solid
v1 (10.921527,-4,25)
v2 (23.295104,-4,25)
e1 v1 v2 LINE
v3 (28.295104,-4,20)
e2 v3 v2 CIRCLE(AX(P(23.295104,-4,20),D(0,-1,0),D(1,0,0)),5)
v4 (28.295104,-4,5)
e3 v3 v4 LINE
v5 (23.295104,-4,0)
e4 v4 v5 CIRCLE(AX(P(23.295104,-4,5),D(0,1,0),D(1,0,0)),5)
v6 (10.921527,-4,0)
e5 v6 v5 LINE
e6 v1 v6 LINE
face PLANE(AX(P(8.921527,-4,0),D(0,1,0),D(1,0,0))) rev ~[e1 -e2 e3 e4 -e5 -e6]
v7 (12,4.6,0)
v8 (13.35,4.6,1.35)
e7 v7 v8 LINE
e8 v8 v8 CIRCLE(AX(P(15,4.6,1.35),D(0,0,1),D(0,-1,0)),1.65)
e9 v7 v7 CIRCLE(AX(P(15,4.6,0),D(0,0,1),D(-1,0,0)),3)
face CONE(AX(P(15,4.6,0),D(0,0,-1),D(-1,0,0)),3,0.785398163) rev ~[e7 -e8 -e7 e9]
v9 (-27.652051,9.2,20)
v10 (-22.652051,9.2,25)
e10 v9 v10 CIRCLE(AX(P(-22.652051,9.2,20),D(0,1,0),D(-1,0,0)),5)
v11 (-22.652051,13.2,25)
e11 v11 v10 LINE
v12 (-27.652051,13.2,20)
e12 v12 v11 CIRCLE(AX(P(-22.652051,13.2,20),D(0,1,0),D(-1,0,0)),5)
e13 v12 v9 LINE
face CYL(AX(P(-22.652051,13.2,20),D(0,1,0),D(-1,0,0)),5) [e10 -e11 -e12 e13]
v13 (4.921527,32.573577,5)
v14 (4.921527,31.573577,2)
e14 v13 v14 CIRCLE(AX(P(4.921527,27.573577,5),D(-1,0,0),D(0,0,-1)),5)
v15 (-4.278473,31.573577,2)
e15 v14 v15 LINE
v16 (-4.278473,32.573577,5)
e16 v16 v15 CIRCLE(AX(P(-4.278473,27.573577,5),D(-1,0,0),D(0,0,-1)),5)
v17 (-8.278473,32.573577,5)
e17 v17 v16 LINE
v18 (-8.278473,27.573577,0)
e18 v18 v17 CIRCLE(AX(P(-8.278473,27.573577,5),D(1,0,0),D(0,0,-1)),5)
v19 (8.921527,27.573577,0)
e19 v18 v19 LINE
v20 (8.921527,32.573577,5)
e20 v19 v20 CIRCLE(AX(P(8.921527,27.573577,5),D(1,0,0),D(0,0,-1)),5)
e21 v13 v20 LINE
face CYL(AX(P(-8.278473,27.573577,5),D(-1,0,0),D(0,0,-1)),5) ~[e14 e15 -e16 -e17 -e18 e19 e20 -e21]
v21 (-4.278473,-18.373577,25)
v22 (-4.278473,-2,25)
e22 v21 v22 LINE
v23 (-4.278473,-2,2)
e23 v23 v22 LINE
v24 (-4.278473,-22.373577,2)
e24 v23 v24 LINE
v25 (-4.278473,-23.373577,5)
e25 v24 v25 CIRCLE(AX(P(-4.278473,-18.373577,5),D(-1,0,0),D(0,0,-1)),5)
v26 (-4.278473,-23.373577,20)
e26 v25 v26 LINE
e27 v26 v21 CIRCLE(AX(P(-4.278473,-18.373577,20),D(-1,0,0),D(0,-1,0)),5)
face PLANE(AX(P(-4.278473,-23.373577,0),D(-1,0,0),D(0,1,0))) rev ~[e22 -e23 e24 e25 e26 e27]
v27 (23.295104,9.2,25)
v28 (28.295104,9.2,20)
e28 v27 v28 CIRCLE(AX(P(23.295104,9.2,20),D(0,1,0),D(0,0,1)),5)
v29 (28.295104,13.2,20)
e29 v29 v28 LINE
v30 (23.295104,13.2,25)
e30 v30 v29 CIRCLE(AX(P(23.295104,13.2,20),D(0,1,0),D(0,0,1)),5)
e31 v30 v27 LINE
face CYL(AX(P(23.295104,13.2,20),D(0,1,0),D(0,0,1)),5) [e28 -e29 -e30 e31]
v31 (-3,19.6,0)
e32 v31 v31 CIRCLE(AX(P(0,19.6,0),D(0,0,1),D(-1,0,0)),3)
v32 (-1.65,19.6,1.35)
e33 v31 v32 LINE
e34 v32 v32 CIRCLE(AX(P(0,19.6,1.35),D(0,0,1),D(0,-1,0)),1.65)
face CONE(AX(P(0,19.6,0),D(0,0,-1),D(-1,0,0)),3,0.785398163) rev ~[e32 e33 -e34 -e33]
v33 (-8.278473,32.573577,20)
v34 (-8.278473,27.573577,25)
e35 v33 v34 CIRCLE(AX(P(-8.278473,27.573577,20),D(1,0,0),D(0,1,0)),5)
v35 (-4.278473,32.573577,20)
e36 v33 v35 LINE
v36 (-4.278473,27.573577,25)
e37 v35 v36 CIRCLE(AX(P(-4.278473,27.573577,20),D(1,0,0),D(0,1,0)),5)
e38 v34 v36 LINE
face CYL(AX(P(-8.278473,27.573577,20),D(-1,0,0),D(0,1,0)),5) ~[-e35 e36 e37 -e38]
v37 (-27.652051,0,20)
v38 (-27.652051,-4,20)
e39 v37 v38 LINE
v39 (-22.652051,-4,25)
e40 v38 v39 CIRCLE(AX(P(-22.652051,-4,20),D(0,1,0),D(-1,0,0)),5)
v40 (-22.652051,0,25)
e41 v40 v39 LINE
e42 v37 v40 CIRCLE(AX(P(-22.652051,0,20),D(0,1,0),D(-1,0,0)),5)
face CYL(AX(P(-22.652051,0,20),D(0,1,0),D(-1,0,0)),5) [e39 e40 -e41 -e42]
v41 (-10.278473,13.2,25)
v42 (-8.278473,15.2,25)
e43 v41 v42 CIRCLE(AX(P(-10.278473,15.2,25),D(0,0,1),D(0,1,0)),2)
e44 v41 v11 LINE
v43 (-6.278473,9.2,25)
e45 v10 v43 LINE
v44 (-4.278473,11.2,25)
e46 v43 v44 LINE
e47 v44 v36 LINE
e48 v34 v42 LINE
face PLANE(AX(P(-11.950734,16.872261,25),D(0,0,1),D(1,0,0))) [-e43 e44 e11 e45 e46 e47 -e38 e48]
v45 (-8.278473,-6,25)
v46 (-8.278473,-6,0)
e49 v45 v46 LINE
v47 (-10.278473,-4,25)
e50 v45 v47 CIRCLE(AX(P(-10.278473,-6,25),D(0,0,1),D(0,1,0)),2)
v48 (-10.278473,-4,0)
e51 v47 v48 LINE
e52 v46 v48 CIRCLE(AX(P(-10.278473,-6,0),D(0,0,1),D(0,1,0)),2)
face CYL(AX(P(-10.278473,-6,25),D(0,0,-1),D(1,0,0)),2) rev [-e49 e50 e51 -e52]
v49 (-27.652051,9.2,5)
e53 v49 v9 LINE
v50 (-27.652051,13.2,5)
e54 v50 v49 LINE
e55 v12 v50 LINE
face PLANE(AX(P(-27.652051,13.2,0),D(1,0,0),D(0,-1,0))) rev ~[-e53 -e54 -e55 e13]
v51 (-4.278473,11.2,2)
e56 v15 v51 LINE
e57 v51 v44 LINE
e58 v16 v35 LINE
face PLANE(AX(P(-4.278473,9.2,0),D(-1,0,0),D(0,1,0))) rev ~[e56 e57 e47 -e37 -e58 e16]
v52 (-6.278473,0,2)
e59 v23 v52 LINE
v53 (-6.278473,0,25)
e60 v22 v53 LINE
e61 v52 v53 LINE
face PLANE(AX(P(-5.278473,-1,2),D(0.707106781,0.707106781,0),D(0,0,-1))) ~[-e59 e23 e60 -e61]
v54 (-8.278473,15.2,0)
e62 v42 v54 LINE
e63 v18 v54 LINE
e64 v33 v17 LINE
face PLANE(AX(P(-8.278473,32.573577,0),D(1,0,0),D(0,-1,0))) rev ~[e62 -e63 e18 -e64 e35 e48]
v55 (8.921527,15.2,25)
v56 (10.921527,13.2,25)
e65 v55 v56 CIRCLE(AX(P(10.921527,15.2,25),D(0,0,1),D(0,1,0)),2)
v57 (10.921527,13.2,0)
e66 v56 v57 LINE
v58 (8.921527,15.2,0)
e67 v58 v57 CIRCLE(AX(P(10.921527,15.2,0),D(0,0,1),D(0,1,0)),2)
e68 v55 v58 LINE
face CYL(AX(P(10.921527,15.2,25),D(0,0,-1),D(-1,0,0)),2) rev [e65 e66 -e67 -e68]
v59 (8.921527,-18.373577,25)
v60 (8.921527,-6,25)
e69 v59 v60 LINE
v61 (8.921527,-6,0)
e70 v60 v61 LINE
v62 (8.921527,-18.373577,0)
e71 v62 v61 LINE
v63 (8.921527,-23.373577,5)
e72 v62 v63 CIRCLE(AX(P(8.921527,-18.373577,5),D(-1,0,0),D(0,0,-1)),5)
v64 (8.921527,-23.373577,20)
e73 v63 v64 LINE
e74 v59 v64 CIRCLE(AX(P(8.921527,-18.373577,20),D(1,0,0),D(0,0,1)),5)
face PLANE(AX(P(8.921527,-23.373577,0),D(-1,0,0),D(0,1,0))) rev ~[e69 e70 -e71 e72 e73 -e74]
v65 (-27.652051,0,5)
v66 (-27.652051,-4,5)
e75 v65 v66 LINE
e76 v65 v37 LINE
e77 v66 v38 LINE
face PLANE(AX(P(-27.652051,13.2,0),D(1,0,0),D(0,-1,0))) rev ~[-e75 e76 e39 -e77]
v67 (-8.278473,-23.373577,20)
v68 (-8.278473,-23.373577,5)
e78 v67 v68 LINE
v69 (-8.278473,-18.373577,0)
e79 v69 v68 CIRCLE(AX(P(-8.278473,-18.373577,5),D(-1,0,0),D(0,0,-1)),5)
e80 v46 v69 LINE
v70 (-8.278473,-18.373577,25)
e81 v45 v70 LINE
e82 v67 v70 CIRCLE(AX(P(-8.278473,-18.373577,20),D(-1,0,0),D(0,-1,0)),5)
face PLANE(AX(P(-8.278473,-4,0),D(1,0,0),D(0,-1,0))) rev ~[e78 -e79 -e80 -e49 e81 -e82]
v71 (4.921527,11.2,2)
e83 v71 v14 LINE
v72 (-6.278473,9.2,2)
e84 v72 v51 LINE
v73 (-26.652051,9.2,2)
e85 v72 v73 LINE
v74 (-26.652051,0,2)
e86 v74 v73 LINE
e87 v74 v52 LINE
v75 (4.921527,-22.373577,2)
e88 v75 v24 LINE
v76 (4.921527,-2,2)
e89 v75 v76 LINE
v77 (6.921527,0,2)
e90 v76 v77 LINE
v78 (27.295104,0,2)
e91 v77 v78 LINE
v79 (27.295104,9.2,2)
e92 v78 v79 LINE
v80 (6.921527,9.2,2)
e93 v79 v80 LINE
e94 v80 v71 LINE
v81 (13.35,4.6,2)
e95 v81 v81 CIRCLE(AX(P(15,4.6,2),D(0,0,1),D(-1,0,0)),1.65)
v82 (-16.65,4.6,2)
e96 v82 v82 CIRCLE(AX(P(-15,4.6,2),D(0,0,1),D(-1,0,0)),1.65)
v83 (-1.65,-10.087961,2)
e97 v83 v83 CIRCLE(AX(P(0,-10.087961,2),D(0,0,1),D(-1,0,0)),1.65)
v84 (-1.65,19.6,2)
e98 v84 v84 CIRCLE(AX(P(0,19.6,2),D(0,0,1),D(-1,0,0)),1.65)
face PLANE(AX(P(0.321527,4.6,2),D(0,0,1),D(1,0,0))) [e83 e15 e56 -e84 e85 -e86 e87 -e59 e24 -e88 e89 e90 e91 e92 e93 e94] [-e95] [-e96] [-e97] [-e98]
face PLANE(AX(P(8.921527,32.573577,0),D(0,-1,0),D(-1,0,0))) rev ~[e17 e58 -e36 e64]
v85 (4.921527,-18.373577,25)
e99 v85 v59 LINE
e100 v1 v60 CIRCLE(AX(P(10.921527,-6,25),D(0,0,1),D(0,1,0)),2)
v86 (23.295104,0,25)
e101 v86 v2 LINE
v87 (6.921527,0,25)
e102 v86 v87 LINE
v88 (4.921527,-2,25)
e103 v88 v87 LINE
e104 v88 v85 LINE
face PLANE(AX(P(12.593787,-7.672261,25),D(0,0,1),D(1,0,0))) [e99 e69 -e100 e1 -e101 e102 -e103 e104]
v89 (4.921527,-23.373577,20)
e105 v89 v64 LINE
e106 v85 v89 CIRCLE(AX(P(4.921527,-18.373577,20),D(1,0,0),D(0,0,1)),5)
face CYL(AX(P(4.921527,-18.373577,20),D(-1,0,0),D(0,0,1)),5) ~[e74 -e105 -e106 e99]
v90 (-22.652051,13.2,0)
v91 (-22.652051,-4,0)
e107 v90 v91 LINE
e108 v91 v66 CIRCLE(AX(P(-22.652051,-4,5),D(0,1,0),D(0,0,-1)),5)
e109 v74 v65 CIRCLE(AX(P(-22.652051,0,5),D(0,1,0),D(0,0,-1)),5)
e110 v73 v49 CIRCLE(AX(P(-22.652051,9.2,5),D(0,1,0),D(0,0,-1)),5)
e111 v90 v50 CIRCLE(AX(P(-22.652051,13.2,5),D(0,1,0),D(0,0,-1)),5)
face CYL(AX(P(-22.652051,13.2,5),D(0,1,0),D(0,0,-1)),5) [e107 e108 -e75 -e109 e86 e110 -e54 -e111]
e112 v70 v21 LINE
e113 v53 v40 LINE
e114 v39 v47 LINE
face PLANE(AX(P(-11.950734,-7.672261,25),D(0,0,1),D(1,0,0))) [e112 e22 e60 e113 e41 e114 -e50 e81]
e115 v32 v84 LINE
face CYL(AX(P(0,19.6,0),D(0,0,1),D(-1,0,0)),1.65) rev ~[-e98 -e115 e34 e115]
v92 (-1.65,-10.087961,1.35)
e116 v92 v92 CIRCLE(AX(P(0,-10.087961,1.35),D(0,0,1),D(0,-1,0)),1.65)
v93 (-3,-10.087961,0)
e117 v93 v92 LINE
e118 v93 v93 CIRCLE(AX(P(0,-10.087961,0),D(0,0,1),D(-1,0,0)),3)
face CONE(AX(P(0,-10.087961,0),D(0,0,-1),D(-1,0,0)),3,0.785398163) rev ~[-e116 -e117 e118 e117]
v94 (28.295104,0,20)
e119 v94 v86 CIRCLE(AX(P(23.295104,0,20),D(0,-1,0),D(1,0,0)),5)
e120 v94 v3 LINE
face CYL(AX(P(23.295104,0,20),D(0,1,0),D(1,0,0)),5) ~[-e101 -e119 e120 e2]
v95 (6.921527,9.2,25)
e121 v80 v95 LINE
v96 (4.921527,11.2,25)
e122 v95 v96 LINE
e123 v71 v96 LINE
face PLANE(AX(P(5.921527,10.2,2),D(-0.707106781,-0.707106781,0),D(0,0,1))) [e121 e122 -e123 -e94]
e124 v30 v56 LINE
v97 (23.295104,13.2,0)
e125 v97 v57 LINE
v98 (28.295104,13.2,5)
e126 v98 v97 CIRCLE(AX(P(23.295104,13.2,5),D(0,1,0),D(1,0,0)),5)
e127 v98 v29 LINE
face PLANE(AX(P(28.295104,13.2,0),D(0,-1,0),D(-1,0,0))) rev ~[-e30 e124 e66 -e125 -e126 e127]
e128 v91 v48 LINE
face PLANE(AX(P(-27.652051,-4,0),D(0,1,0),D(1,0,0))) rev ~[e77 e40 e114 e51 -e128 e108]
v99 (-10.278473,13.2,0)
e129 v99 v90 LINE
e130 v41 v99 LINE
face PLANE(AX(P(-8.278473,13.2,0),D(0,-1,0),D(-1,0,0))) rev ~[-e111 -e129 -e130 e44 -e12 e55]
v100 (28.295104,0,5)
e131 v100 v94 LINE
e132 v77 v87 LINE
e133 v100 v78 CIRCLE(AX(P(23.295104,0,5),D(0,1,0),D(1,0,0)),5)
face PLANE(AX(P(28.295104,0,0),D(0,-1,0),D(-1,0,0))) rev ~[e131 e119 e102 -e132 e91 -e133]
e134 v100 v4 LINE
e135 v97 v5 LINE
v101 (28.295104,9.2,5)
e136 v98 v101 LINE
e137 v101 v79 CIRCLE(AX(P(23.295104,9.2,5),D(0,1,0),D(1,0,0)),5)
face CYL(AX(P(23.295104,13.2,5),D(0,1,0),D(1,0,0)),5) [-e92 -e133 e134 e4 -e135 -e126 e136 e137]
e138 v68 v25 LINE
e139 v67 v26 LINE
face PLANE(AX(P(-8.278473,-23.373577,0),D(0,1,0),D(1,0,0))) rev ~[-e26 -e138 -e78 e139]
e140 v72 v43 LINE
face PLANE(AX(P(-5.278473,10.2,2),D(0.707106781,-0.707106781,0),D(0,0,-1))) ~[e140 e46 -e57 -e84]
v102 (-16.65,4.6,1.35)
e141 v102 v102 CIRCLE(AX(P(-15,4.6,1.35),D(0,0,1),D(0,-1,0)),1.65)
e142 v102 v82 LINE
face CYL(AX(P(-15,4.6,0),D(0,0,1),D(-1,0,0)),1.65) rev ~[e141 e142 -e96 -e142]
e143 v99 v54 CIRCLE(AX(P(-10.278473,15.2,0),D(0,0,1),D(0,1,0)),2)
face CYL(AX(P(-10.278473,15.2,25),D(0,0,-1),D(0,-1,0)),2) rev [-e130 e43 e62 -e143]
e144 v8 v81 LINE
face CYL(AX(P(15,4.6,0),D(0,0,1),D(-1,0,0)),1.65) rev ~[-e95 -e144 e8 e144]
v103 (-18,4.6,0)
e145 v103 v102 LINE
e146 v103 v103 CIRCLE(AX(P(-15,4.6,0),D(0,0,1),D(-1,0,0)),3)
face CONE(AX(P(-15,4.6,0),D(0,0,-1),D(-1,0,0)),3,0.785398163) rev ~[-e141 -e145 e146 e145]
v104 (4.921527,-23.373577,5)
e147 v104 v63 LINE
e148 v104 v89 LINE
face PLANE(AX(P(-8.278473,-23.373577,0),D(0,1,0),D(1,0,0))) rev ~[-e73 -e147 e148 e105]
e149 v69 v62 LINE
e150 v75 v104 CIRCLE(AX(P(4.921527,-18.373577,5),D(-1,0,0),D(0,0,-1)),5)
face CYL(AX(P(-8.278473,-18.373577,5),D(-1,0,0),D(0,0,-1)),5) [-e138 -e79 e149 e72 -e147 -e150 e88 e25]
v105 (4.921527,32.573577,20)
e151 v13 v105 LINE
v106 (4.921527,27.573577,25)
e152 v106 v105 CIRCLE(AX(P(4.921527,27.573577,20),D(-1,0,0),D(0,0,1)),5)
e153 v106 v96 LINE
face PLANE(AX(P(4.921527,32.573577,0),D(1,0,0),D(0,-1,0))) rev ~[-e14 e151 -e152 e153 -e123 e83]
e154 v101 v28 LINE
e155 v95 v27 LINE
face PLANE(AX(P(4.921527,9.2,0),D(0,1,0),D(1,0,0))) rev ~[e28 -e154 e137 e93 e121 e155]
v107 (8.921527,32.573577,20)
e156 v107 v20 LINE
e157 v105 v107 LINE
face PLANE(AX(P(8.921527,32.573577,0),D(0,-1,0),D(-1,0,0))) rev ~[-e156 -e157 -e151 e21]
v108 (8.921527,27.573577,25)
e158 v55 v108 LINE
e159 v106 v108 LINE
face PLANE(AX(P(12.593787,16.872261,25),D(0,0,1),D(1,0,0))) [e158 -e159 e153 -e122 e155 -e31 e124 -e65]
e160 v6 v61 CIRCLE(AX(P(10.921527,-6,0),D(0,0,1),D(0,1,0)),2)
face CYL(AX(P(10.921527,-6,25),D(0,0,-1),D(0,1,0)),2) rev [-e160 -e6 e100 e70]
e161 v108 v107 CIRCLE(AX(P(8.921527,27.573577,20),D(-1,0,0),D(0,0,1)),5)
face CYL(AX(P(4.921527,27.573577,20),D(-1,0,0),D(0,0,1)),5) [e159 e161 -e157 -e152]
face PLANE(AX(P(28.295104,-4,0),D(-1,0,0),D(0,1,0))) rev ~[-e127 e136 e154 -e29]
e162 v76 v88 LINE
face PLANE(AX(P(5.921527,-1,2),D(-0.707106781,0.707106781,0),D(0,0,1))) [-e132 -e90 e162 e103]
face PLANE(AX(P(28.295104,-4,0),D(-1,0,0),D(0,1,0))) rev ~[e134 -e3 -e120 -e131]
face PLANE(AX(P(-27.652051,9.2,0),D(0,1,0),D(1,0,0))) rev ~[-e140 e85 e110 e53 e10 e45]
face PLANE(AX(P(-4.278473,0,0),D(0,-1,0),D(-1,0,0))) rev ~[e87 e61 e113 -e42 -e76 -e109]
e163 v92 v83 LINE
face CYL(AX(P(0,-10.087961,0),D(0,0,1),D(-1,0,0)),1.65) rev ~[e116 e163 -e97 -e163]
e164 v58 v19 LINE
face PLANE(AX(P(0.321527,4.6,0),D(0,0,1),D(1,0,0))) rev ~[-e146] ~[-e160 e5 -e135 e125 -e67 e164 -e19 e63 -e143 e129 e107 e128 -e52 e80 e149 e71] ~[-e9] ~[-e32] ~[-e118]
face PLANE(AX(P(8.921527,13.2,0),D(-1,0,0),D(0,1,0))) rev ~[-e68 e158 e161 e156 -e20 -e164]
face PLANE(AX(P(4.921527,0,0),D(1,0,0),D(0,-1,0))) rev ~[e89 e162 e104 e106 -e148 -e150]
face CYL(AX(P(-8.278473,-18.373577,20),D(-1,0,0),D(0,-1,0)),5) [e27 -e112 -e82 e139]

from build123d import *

# Parameters (mm, degrees)
F1_DEPTH       = 2
F2_DEPTH       = 25
F3_R           = 2
F4_T1_DEPTH    = 4
F4_T3_DEPTH    = 4
F4_T5_DEPTH    = 4
F4_T7_DEPTH    = 17.2
F4_T9_DEPTH    = 17.2
F4_T11_DEPTH   = 4
F5_R           = 2
F6_SIZE        = 2
F8_D           = 3.3
F8_CSINK_D     = 6
F8_CSINK_ANGLE = 90


# Not quite as in the source:
# - a fillet or chamfer that OpenCascade refuses, or shapes differently, is made with other operations: its cross-section is extruded or revolved along the edge and cut away or added
# - a feature names something its author has since deleted; it is built from what else it names


with BuildPart() as f1:
    # F0 (on Top) → F1 (new body)
    with BuildSketch(Plane.XY):
        Polygon((28.2951036699, 0), (28.2951036699, 9.2), (4.9215265818, 9.2), (4.9215265818, 32.5735770881), (-4.2784734182, 32.5735770881), (-4.2784734182, 9.2), (-27.6520505063, 9.2), (-27.6520505063, 0), (-4.2784734182, 0), (-4.2784734182, -23.3735770881), (4.9215265818, -23.3735770881), (4.9215265818, 0), align=None)
        Polygon((4.9215265818, 9.2), (28.2951036699, 9.2), (28.2951036699, 13.2), (8.9215265818, 13.2), (8.9215265818, 32.5735770881), (4.9215265818, 32.5735770881), align=None)
        Polygon((28.2951036699, -4), (28.2951036699, 0), (4.9215265818, 0), (4.9215265818, -23.3735770881), (8.9215265818, -23.3735770881), (8.9215265818, -4), align=None)
        Polygon((-4.2784734182, 9.2), (-4.2784734182, 32.5735770881), (-8.2784734182, 32.5735770881), (-8.2784734182, 13.2), (-27.6520505063, 13.2), (-27.6520505063, 9.2), align=None)
        Polygon((-8.2784734182, -23.3735770881), (-4.2784734182, -23.3735770881), (-4.2784734182, 0), (-27.6520505063, 0), (-27.6520505063, -4), (-8.2784734182, -4), align=None)
    extrude(amount=F1_DEPTH)

    # F0 (on Top) → F2 (join)
    with BuildSketch(Plane.XY):
        Polygon((-4.2784734182, 9.2), (-4.2784734182, 32.5735770881), (-8.2784734182, 32.5735770881), (-8.2784734182, 13.2), (-27.6520505063, 13.2), (-27.6520505063, 9.2), align=None)
        Polygon((4.9215265818, 9.2), (28.2951036699, 9.2), (28.2951036699, 13.2), (8.9215265818, 13.2), (8.9215265818, 32.5735770881), (4.9215265818, 32.5735770881), align=None)
        Polygon((-8.2784734182, -23.3735770881), (-4.2784734182, -23.3735770881), (-4.2784734182, 0), (-27.6520505063, 0), (-27.6520505063, -4), (-8.2784734182, -4), align=None)
        Polygon((28.2951036699, -4), (28.2951036699, 0), (4.9215265818, 0), (4.9215265818, -23.3735770881), (8.9215265818, -23.3735770881), (8.9215265818, -4), align=None)
    extrude(amount=F2_DEPTH)

    # F3
    f3_edges = [f1.edges().sort_by_distance(p)[0] for p in [
        (8.921527, 13.2, 12.5),
        (8.921527, -4, 12.5),
    ]]
    fillet(f3_edges, radius=F3_R)

    # F4: fillet of radius 5 on 12 edges, made by hand

    # F4_s2 → F4_t1 (cut)
    with BuildSketch(Plane.XZ.offset(-13.2)):
        with BuildLine():
            ThreePointArc((23.2951036699, 25), (26.8306375758, 23.5355339059), (28.2951036699, 20))
            Line((28.2951036699, 20), (28.3951036699, 20))
            Line((28.3951036699, 20), (28.3951036699, 25.1))
            Line((28.3951036699, 25.1), (23.2951036699, 25.1))
            Line((23.2951036699, 25.1), (23.2951036699, 25))
        make_face()
        with BuildLine():
            ThreePointArc((-27.6520505063, 20), (-26.1875844123, 23.5355339059), (-22.6520505063, 25))
            Line((-22.6520505063, 25), (-22.6520505063, 25.1))
            Line((-22.6520505063, 25.1), (-27.7520505063, 25.1))
            Line((-27.7520505063, 25.1), (-27.7520505063, 20))
            Line((-27.7520505063, 20), (-27.6520505063, 20))
        make_face()
    extrude(amount=F4_T1_DEPTH, mode=Mode.SUBTRACT)

    # F4_s4 → F4_t3 (cut)
    with BuildSketch(Plane.YZ.offset(-8.2784734182)):
        with BuildLine():
            ThreePointArc((32.5735770881, 20), (31.1091109941, 23.5355339059), (27.5735770881, 25))
            Line((27.5735770881, 25), (27.5735770881, 25.1))
            Line((27.5735770881, 25.1), (32.6735770881, 25.1))
            Line((32.6735770881, 25.1), (32.6735770881, 20))
            Line((32.6735770881, 20), (32.5735770881, 20))
        make_face()
        with BuildLine():
            ThreePointArc((-23.3735770881, 20), (-21.9091109941, 23.5355339059), (-18.3735770881, 25))
            Line((-18.3735770881, 25), (-18.3735770881, 25.1))
            Line((-18.3735770881, 25.1), (-23.4735770881, 25.1))
            Line((-23.4735770881, 25.1), (-23.4735770881, 20))
            Line((-23.4735770881, 20), (-23.3735770881, 20))
        make_face()
    extrude(amount=F4_T3_DEPTH, mode=Mode.SUBTRACT)

    # F4_s6 → F4_t5 (cut)
    with BuildSketch(Plane.YZ.offset(4.9215265818)):
        with BuildLine():
            ThreePointArc((27.5735770881, 25), (31.1091109941, 23.5355339059), (32.5735770881, 20))
            Line((32.5735770881, 20), (32.6735770881, 20))
            Line((32.6735770881, 20), (32.6735770881, 25.1))
            Line((32.6735770881, 25.1), (27.5735770881, 25.1))
            Line((27.5735770881, 25.1), (27.5735770881, 25))
        make_face()
        with BuildLine():
            ThreePointArc((-18.3735770881, 25), (-21.9091109941, 23.5355339059), (-23.3735770881, 20))
            Line((-23.3735770881, 20), (-23.4735770881, 20))
            Line((-23.4735770881, 20), (-23.4735770881, 25.1))
            Line((-23.4735770881, 25.1), (-18.3735770881, 25.1))
            Line((-18.3735770881, 25.1), (-18.3735770881, 25))
        make_face()
    extrude(amount=F4_T5_DEPTH, mode=Mode.SUBTRACT)

    # F4_s8 → F4_t7 (cut)
    with BuildSketch(Plane.XZ.offset(-13.2)):
        with BuildLine():
            ThreePointArc((-22.6520505063, 0), (-26.1875844123, 1.4644660941), (-27.6520505063, 5))
            Line((-27.6520505063, 5), (-27.7520505063, 5))
            Line((-27.7520505063, 5), (-27.7520505063, -0.1))
            Line((-27.7520505063, -0.1), (-22.6520505063, -0.1))
            Line((-22.6520505063, -0.1), (-22.6520505063, 0))
        make_face()
        with BuildLine():
            ThreePointArc((28.2951036699, 5), (26.8306375758, 1.4644660941), (23.2951036699, 0))
            Line((23.2951036699, 0), (23.2951036699, -0.1))
            Line((23.2951036699, -0.1), (28.3951036699, -0.1))
            Line((28.3951036699, -0.1), (28.3951036699, 5))
            Line((28.3951036699, 5), (28.2951036699, 5))
        make_face()
    extrude(amount=F4_T7_DEPTH, mode=Mode.SUBTRACT)

    # F4_s10 → F4_t9 (cut)
    with BuildSketch(Plane.YZ.offset(-8.2784734182)):
        with BuildLine():
            ThreePointArc((27.5735770881, 0), (31.1091109941, 1.4644660941), (32.5735770881, 5))
            Line((32.5735770881, 5), (32.6735770881, 5))
            Line((32.6735770881, 5), (32.6735770881, -0.1))
            Line((32.6735770881, -0.1), (27.5735770881, -0.1))
            Line((27.5735770881, -0.1), (27.5735770881, 0))
        make_face()
        with BuildLine():
            ThreePointArc((-18.3735770881, 0), (-21.9091109941, 1.4644660941), (-23.3735770881, 5))
            Line((-23.3735770881, 5), (-23.4735770881, 5))
            Line((-23.4735770881, 5), (-23.4735770881, -0.1))
            Line((-23.4735770881, -0.1), (-18.3735770881, -0.1))
            Line((-18.3735770881, -0.1), (-18.3735770881, 0))
        make_face()
    extrude(amount=F4_T9_DEPTH, mode=Mode.SUBTRACT)

    # F4_s12 → F4_t11 (cut)
    with BuildSketch(Plane.XZ):
        with BuildLine():
            ThreePointArc((28.2951036699, 20), (26.8306375758, 23.5355339059), (23.2951036699, 25))
            Line((23.2951036699, 25), (23.2951036699, 25.1))
            Line((23.2951036699, 25.1), (28.3951036699, 25.1))
            Line((28.3951036699, 25.1), (28.3951036699, 20))
            Line((28.3951036699, 20), (28.2951036699, 20))
        make_face()
        with BuildLine():
            ThreePointArc((-27.6520505063, 20), (-26.1875844123, 23.5355339059), (-22.6520505063, 25))
            Line((-22.6520505063, 25), (-22.6520505063, 25.1))
            Line((-22.6520505063, 25.1), (-27.7520505063, 25.1))
            Line((-27.7520505063, 25.1), (-27.7520505063, 20))
            Line((-27.7520505063, 20), (-27.6520505063, 20))
        make_face()
    extrude(amount=F4_T11_DEPTH, mode=Mode.SUBTRACT)

    # F5
    f5_edges = [f1.edges().sort_by_distance(p)[0] for p in [
        (-8.278473, 13.2, 12.5),
        (-8.278473, -4, 12.5),
    ]]
    fillet(f5_edges, radius=F5_R)

    # F6
    f6_edges = [f1.edges().sort_by_distance(p)[0] for p in [
        (4.921527, 9.2, 13.5),
        (-4.278473, 9.2, 13.5),
        (4.921527, 0, 13.5),
        (-4.278473, 0, 13.5),
    ]]
    chamfer(f6_edges, length=F6_SIZE)

    # F8 (through all)
    with Locations(Plane(origin=(0, 0, 0), x_dir=(1, 0, 0), z_dir=(0, 0, -1))):
        with Locations((0, 10.087961331), (-15, -4.6), (15, -4.6), (0, -19.6)):
            CounterSinkHole(F8_D / 2, F8_CSINK_D / 2, counter_sink_angle=F8_CSINK_ANGLE)


solid = f1.part
